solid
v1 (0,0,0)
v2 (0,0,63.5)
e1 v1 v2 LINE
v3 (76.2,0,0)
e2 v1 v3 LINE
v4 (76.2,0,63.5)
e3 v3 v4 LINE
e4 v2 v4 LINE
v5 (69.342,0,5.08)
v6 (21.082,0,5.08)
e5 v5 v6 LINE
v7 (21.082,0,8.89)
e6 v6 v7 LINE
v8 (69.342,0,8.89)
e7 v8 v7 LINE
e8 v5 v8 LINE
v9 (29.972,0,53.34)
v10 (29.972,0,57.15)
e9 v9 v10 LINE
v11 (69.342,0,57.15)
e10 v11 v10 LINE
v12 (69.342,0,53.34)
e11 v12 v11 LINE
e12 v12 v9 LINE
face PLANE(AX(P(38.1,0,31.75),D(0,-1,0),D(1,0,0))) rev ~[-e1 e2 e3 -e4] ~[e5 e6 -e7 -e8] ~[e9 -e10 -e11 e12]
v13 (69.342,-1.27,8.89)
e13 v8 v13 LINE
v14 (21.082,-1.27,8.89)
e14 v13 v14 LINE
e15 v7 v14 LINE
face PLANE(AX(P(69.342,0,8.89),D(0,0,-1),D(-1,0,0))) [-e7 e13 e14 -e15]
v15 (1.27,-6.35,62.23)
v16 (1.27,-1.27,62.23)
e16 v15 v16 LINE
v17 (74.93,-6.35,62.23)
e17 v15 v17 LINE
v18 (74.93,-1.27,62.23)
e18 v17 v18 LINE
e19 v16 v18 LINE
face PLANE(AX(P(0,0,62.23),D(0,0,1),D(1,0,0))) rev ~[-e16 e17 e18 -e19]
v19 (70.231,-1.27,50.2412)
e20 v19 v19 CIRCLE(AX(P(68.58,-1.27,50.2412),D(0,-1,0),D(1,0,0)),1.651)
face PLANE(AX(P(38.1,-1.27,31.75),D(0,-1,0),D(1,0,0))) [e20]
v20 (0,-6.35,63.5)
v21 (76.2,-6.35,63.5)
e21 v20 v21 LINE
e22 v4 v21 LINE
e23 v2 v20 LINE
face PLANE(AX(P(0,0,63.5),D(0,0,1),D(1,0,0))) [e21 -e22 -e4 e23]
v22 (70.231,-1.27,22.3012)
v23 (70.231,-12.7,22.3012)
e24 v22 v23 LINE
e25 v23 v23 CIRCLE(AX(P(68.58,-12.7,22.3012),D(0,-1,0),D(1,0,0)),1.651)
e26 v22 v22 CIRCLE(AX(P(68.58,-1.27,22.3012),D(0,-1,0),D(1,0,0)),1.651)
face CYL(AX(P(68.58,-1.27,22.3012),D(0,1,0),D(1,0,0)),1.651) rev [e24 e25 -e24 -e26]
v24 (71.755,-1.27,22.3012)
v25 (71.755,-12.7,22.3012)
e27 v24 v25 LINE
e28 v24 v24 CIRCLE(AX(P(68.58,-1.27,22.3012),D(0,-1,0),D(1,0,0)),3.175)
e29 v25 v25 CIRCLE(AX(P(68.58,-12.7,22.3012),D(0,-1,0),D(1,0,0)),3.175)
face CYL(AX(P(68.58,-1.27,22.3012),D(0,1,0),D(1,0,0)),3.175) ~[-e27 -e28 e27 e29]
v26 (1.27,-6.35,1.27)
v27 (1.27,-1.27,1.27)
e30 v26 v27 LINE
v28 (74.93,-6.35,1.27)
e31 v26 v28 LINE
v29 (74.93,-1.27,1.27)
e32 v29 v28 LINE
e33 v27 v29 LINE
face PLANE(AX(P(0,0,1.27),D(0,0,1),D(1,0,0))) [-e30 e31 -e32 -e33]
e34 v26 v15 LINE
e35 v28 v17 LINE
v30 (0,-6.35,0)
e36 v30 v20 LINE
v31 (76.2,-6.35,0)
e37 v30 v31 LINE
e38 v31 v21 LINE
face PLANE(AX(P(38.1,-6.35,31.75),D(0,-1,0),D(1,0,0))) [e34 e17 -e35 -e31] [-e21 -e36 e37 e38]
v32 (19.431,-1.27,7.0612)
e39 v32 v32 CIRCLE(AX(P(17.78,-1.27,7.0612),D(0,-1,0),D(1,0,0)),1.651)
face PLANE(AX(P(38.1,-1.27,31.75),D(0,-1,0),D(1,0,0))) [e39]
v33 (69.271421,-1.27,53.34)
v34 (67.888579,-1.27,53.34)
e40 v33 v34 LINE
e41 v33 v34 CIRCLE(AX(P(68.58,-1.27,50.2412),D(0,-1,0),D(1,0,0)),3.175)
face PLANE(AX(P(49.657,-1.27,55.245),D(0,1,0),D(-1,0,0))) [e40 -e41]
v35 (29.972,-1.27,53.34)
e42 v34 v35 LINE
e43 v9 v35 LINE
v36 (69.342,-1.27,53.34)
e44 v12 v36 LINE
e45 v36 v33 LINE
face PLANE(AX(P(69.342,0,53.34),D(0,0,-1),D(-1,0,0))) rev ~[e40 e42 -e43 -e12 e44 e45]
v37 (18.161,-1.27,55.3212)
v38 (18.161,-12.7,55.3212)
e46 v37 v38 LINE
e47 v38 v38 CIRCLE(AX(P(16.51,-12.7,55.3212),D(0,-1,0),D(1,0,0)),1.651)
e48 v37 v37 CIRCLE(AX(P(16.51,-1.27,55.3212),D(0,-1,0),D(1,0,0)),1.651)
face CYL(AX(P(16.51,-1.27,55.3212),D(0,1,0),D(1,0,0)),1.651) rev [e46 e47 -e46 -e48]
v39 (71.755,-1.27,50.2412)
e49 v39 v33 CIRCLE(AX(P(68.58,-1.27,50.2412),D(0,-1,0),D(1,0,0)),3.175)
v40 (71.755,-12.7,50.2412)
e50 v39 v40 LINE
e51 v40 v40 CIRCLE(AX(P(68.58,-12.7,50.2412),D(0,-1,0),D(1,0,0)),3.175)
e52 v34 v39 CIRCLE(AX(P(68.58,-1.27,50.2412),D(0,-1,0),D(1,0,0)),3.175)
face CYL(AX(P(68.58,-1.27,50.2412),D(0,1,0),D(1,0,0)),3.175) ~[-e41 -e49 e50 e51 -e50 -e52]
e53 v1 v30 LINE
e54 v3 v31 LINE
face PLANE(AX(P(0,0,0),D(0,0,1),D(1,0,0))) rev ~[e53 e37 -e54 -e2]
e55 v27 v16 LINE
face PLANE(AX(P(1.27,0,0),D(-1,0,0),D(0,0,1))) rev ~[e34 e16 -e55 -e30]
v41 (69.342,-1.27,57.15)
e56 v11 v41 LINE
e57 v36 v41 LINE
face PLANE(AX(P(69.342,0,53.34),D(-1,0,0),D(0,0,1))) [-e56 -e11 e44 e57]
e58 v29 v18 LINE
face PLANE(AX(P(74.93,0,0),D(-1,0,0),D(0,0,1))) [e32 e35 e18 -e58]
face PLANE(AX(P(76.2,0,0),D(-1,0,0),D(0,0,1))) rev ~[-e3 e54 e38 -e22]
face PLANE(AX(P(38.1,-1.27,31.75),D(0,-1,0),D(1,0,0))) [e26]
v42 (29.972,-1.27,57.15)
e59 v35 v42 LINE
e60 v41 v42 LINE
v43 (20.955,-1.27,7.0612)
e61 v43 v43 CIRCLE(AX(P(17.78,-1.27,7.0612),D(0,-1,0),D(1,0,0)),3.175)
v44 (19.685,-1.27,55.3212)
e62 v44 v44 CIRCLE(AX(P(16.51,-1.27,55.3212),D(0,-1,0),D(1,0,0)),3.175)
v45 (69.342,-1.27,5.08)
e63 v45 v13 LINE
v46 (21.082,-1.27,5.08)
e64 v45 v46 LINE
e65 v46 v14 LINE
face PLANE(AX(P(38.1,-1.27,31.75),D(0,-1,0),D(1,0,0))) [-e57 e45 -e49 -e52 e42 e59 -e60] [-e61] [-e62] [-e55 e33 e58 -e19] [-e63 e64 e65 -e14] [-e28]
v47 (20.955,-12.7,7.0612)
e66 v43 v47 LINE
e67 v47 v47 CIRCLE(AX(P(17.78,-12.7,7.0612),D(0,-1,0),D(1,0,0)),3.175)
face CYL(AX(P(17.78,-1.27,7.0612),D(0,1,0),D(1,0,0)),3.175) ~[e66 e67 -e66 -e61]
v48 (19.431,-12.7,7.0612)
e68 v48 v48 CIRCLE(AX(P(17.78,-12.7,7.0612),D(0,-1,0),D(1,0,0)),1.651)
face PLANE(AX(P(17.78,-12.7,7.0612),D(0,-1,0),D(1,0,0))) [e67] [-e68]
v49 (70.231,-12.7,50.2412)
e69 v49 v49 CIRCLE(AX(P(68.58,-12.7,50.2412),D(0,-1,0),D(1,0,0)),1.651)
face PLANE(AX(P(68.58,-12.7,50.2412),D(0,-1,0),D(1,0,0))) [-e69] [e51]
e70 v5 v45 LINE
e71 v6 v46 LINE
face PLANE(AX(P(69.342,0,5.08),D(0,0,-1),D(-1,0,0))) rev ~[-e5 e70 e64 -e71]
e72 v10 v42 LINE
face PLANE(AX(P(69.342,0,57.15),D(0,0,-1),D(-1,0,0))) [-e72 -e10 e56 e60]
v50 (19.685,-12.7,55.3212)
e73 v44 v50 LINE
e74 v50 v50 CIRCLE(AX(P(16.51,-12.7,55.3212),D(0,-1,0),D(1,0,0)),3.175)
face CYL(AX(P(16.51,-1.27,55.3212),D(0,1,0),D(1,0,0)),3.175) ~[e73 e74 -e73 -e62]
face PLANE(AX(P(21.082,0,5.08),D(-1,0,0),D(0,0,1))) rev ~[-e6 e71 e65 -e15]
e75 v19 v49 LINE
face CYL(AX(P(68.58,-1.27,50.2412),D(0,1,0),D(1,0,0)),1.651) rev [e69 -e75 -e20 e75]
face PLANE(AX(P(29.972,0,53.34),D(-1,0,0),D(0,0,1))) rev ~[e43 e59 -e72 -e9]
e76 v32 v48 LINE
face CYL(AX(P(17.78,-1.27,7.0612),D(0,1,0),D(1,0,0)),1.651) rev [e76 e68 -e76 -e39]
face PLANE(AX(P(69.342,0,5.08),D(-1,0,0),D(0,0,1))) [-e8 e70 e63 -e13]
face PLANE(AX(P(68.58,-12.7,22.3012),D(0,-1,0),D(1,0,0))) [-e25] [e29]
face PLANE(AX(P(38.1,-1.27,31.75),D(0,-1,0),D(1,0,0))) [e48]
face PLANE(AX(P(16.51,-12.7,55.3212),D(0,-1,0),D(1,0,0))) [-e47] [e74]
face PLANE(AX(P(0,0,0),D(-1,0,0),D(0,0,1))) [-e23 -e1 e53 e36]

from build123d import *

# Parameters (mm, degrees)
F0_W     = 76.2
F0_H     = 63.5
F1_DEPTH = 6.35
F2_T     = -1.27
F3_R     = 3.175
F3_R_2   = 1.651
F4_DEPTH = 11.43
F5_W     = 48.26
F5_H     = 3.81
F5_W_2   = 39.37
F6_DEPTH = 1.27


# Not quite as in the source:
# - a feature names something its author has since deleted; it is built from what else it names


with BuildPart() as f1:
    # F0 (on Front) → F1 (new body)
    with BuildSketch(Plane.XZ):
        with Locations((38.1, 31.75)):
            Rectangle(F0_W, F0_H)
    extrude(amount=F1_DEPTH)

    # F2
    f2_openings = [f1.faces().sort_by_distance(p)[0] for p in [
        (38.1, -6.35, 31.75),
    ]]
    offset(amount=F2_T, openings=f2_openings)

    # F3 (on face) → F4 (join)
    with BuildSketch(Plane.XZ.offset(1.27)):
        with Locations((16.51, 55.3212)):
            Circle(F3_R)
        with Locations((16.51, 55.3212)):
            Circle(F3_R_2, mode=Mode.SUBTRACT)
        with Locations((68.58, 50.2412)):
            Circle(F3_R)
        with Locations((68.58, 50.2412)):
            Circle(F3_R_2, mode=Mode.SUBTRACT)
        with Locations((68.58, 22.3012)):
            Circle(F3_R)
        with Locations((68.58, 22.3012)):
            Circle(F3_R_2, mode=Mode.SUBTRACT)
        with Locations((17.78, 7.0612)):
            Circle(F3_R)
        with Locations((17.78, 7.0612)):
            Circle(F3_R_2, mode=Mode.SUBTRACT)
    extrude(amount=F4_DEPTH)

    # F5 (on face) → F6 (cut)
    with BuildSketch(Plane(origin=(0, 0, 0), x_dir=(-1, 0, 0), z_dir=(0, 1, 0))):
        with Locations((-45.212, 6.985)):
            Rectangle(F5_W, F5_H)
        with Locations((-49.657, 55.245)):
            Rectangle(F5_W_2, F5_H)
    extrude(amount=-F6_DEPTH, mode=Mode.SUBTRACT)


solid = f1.part
